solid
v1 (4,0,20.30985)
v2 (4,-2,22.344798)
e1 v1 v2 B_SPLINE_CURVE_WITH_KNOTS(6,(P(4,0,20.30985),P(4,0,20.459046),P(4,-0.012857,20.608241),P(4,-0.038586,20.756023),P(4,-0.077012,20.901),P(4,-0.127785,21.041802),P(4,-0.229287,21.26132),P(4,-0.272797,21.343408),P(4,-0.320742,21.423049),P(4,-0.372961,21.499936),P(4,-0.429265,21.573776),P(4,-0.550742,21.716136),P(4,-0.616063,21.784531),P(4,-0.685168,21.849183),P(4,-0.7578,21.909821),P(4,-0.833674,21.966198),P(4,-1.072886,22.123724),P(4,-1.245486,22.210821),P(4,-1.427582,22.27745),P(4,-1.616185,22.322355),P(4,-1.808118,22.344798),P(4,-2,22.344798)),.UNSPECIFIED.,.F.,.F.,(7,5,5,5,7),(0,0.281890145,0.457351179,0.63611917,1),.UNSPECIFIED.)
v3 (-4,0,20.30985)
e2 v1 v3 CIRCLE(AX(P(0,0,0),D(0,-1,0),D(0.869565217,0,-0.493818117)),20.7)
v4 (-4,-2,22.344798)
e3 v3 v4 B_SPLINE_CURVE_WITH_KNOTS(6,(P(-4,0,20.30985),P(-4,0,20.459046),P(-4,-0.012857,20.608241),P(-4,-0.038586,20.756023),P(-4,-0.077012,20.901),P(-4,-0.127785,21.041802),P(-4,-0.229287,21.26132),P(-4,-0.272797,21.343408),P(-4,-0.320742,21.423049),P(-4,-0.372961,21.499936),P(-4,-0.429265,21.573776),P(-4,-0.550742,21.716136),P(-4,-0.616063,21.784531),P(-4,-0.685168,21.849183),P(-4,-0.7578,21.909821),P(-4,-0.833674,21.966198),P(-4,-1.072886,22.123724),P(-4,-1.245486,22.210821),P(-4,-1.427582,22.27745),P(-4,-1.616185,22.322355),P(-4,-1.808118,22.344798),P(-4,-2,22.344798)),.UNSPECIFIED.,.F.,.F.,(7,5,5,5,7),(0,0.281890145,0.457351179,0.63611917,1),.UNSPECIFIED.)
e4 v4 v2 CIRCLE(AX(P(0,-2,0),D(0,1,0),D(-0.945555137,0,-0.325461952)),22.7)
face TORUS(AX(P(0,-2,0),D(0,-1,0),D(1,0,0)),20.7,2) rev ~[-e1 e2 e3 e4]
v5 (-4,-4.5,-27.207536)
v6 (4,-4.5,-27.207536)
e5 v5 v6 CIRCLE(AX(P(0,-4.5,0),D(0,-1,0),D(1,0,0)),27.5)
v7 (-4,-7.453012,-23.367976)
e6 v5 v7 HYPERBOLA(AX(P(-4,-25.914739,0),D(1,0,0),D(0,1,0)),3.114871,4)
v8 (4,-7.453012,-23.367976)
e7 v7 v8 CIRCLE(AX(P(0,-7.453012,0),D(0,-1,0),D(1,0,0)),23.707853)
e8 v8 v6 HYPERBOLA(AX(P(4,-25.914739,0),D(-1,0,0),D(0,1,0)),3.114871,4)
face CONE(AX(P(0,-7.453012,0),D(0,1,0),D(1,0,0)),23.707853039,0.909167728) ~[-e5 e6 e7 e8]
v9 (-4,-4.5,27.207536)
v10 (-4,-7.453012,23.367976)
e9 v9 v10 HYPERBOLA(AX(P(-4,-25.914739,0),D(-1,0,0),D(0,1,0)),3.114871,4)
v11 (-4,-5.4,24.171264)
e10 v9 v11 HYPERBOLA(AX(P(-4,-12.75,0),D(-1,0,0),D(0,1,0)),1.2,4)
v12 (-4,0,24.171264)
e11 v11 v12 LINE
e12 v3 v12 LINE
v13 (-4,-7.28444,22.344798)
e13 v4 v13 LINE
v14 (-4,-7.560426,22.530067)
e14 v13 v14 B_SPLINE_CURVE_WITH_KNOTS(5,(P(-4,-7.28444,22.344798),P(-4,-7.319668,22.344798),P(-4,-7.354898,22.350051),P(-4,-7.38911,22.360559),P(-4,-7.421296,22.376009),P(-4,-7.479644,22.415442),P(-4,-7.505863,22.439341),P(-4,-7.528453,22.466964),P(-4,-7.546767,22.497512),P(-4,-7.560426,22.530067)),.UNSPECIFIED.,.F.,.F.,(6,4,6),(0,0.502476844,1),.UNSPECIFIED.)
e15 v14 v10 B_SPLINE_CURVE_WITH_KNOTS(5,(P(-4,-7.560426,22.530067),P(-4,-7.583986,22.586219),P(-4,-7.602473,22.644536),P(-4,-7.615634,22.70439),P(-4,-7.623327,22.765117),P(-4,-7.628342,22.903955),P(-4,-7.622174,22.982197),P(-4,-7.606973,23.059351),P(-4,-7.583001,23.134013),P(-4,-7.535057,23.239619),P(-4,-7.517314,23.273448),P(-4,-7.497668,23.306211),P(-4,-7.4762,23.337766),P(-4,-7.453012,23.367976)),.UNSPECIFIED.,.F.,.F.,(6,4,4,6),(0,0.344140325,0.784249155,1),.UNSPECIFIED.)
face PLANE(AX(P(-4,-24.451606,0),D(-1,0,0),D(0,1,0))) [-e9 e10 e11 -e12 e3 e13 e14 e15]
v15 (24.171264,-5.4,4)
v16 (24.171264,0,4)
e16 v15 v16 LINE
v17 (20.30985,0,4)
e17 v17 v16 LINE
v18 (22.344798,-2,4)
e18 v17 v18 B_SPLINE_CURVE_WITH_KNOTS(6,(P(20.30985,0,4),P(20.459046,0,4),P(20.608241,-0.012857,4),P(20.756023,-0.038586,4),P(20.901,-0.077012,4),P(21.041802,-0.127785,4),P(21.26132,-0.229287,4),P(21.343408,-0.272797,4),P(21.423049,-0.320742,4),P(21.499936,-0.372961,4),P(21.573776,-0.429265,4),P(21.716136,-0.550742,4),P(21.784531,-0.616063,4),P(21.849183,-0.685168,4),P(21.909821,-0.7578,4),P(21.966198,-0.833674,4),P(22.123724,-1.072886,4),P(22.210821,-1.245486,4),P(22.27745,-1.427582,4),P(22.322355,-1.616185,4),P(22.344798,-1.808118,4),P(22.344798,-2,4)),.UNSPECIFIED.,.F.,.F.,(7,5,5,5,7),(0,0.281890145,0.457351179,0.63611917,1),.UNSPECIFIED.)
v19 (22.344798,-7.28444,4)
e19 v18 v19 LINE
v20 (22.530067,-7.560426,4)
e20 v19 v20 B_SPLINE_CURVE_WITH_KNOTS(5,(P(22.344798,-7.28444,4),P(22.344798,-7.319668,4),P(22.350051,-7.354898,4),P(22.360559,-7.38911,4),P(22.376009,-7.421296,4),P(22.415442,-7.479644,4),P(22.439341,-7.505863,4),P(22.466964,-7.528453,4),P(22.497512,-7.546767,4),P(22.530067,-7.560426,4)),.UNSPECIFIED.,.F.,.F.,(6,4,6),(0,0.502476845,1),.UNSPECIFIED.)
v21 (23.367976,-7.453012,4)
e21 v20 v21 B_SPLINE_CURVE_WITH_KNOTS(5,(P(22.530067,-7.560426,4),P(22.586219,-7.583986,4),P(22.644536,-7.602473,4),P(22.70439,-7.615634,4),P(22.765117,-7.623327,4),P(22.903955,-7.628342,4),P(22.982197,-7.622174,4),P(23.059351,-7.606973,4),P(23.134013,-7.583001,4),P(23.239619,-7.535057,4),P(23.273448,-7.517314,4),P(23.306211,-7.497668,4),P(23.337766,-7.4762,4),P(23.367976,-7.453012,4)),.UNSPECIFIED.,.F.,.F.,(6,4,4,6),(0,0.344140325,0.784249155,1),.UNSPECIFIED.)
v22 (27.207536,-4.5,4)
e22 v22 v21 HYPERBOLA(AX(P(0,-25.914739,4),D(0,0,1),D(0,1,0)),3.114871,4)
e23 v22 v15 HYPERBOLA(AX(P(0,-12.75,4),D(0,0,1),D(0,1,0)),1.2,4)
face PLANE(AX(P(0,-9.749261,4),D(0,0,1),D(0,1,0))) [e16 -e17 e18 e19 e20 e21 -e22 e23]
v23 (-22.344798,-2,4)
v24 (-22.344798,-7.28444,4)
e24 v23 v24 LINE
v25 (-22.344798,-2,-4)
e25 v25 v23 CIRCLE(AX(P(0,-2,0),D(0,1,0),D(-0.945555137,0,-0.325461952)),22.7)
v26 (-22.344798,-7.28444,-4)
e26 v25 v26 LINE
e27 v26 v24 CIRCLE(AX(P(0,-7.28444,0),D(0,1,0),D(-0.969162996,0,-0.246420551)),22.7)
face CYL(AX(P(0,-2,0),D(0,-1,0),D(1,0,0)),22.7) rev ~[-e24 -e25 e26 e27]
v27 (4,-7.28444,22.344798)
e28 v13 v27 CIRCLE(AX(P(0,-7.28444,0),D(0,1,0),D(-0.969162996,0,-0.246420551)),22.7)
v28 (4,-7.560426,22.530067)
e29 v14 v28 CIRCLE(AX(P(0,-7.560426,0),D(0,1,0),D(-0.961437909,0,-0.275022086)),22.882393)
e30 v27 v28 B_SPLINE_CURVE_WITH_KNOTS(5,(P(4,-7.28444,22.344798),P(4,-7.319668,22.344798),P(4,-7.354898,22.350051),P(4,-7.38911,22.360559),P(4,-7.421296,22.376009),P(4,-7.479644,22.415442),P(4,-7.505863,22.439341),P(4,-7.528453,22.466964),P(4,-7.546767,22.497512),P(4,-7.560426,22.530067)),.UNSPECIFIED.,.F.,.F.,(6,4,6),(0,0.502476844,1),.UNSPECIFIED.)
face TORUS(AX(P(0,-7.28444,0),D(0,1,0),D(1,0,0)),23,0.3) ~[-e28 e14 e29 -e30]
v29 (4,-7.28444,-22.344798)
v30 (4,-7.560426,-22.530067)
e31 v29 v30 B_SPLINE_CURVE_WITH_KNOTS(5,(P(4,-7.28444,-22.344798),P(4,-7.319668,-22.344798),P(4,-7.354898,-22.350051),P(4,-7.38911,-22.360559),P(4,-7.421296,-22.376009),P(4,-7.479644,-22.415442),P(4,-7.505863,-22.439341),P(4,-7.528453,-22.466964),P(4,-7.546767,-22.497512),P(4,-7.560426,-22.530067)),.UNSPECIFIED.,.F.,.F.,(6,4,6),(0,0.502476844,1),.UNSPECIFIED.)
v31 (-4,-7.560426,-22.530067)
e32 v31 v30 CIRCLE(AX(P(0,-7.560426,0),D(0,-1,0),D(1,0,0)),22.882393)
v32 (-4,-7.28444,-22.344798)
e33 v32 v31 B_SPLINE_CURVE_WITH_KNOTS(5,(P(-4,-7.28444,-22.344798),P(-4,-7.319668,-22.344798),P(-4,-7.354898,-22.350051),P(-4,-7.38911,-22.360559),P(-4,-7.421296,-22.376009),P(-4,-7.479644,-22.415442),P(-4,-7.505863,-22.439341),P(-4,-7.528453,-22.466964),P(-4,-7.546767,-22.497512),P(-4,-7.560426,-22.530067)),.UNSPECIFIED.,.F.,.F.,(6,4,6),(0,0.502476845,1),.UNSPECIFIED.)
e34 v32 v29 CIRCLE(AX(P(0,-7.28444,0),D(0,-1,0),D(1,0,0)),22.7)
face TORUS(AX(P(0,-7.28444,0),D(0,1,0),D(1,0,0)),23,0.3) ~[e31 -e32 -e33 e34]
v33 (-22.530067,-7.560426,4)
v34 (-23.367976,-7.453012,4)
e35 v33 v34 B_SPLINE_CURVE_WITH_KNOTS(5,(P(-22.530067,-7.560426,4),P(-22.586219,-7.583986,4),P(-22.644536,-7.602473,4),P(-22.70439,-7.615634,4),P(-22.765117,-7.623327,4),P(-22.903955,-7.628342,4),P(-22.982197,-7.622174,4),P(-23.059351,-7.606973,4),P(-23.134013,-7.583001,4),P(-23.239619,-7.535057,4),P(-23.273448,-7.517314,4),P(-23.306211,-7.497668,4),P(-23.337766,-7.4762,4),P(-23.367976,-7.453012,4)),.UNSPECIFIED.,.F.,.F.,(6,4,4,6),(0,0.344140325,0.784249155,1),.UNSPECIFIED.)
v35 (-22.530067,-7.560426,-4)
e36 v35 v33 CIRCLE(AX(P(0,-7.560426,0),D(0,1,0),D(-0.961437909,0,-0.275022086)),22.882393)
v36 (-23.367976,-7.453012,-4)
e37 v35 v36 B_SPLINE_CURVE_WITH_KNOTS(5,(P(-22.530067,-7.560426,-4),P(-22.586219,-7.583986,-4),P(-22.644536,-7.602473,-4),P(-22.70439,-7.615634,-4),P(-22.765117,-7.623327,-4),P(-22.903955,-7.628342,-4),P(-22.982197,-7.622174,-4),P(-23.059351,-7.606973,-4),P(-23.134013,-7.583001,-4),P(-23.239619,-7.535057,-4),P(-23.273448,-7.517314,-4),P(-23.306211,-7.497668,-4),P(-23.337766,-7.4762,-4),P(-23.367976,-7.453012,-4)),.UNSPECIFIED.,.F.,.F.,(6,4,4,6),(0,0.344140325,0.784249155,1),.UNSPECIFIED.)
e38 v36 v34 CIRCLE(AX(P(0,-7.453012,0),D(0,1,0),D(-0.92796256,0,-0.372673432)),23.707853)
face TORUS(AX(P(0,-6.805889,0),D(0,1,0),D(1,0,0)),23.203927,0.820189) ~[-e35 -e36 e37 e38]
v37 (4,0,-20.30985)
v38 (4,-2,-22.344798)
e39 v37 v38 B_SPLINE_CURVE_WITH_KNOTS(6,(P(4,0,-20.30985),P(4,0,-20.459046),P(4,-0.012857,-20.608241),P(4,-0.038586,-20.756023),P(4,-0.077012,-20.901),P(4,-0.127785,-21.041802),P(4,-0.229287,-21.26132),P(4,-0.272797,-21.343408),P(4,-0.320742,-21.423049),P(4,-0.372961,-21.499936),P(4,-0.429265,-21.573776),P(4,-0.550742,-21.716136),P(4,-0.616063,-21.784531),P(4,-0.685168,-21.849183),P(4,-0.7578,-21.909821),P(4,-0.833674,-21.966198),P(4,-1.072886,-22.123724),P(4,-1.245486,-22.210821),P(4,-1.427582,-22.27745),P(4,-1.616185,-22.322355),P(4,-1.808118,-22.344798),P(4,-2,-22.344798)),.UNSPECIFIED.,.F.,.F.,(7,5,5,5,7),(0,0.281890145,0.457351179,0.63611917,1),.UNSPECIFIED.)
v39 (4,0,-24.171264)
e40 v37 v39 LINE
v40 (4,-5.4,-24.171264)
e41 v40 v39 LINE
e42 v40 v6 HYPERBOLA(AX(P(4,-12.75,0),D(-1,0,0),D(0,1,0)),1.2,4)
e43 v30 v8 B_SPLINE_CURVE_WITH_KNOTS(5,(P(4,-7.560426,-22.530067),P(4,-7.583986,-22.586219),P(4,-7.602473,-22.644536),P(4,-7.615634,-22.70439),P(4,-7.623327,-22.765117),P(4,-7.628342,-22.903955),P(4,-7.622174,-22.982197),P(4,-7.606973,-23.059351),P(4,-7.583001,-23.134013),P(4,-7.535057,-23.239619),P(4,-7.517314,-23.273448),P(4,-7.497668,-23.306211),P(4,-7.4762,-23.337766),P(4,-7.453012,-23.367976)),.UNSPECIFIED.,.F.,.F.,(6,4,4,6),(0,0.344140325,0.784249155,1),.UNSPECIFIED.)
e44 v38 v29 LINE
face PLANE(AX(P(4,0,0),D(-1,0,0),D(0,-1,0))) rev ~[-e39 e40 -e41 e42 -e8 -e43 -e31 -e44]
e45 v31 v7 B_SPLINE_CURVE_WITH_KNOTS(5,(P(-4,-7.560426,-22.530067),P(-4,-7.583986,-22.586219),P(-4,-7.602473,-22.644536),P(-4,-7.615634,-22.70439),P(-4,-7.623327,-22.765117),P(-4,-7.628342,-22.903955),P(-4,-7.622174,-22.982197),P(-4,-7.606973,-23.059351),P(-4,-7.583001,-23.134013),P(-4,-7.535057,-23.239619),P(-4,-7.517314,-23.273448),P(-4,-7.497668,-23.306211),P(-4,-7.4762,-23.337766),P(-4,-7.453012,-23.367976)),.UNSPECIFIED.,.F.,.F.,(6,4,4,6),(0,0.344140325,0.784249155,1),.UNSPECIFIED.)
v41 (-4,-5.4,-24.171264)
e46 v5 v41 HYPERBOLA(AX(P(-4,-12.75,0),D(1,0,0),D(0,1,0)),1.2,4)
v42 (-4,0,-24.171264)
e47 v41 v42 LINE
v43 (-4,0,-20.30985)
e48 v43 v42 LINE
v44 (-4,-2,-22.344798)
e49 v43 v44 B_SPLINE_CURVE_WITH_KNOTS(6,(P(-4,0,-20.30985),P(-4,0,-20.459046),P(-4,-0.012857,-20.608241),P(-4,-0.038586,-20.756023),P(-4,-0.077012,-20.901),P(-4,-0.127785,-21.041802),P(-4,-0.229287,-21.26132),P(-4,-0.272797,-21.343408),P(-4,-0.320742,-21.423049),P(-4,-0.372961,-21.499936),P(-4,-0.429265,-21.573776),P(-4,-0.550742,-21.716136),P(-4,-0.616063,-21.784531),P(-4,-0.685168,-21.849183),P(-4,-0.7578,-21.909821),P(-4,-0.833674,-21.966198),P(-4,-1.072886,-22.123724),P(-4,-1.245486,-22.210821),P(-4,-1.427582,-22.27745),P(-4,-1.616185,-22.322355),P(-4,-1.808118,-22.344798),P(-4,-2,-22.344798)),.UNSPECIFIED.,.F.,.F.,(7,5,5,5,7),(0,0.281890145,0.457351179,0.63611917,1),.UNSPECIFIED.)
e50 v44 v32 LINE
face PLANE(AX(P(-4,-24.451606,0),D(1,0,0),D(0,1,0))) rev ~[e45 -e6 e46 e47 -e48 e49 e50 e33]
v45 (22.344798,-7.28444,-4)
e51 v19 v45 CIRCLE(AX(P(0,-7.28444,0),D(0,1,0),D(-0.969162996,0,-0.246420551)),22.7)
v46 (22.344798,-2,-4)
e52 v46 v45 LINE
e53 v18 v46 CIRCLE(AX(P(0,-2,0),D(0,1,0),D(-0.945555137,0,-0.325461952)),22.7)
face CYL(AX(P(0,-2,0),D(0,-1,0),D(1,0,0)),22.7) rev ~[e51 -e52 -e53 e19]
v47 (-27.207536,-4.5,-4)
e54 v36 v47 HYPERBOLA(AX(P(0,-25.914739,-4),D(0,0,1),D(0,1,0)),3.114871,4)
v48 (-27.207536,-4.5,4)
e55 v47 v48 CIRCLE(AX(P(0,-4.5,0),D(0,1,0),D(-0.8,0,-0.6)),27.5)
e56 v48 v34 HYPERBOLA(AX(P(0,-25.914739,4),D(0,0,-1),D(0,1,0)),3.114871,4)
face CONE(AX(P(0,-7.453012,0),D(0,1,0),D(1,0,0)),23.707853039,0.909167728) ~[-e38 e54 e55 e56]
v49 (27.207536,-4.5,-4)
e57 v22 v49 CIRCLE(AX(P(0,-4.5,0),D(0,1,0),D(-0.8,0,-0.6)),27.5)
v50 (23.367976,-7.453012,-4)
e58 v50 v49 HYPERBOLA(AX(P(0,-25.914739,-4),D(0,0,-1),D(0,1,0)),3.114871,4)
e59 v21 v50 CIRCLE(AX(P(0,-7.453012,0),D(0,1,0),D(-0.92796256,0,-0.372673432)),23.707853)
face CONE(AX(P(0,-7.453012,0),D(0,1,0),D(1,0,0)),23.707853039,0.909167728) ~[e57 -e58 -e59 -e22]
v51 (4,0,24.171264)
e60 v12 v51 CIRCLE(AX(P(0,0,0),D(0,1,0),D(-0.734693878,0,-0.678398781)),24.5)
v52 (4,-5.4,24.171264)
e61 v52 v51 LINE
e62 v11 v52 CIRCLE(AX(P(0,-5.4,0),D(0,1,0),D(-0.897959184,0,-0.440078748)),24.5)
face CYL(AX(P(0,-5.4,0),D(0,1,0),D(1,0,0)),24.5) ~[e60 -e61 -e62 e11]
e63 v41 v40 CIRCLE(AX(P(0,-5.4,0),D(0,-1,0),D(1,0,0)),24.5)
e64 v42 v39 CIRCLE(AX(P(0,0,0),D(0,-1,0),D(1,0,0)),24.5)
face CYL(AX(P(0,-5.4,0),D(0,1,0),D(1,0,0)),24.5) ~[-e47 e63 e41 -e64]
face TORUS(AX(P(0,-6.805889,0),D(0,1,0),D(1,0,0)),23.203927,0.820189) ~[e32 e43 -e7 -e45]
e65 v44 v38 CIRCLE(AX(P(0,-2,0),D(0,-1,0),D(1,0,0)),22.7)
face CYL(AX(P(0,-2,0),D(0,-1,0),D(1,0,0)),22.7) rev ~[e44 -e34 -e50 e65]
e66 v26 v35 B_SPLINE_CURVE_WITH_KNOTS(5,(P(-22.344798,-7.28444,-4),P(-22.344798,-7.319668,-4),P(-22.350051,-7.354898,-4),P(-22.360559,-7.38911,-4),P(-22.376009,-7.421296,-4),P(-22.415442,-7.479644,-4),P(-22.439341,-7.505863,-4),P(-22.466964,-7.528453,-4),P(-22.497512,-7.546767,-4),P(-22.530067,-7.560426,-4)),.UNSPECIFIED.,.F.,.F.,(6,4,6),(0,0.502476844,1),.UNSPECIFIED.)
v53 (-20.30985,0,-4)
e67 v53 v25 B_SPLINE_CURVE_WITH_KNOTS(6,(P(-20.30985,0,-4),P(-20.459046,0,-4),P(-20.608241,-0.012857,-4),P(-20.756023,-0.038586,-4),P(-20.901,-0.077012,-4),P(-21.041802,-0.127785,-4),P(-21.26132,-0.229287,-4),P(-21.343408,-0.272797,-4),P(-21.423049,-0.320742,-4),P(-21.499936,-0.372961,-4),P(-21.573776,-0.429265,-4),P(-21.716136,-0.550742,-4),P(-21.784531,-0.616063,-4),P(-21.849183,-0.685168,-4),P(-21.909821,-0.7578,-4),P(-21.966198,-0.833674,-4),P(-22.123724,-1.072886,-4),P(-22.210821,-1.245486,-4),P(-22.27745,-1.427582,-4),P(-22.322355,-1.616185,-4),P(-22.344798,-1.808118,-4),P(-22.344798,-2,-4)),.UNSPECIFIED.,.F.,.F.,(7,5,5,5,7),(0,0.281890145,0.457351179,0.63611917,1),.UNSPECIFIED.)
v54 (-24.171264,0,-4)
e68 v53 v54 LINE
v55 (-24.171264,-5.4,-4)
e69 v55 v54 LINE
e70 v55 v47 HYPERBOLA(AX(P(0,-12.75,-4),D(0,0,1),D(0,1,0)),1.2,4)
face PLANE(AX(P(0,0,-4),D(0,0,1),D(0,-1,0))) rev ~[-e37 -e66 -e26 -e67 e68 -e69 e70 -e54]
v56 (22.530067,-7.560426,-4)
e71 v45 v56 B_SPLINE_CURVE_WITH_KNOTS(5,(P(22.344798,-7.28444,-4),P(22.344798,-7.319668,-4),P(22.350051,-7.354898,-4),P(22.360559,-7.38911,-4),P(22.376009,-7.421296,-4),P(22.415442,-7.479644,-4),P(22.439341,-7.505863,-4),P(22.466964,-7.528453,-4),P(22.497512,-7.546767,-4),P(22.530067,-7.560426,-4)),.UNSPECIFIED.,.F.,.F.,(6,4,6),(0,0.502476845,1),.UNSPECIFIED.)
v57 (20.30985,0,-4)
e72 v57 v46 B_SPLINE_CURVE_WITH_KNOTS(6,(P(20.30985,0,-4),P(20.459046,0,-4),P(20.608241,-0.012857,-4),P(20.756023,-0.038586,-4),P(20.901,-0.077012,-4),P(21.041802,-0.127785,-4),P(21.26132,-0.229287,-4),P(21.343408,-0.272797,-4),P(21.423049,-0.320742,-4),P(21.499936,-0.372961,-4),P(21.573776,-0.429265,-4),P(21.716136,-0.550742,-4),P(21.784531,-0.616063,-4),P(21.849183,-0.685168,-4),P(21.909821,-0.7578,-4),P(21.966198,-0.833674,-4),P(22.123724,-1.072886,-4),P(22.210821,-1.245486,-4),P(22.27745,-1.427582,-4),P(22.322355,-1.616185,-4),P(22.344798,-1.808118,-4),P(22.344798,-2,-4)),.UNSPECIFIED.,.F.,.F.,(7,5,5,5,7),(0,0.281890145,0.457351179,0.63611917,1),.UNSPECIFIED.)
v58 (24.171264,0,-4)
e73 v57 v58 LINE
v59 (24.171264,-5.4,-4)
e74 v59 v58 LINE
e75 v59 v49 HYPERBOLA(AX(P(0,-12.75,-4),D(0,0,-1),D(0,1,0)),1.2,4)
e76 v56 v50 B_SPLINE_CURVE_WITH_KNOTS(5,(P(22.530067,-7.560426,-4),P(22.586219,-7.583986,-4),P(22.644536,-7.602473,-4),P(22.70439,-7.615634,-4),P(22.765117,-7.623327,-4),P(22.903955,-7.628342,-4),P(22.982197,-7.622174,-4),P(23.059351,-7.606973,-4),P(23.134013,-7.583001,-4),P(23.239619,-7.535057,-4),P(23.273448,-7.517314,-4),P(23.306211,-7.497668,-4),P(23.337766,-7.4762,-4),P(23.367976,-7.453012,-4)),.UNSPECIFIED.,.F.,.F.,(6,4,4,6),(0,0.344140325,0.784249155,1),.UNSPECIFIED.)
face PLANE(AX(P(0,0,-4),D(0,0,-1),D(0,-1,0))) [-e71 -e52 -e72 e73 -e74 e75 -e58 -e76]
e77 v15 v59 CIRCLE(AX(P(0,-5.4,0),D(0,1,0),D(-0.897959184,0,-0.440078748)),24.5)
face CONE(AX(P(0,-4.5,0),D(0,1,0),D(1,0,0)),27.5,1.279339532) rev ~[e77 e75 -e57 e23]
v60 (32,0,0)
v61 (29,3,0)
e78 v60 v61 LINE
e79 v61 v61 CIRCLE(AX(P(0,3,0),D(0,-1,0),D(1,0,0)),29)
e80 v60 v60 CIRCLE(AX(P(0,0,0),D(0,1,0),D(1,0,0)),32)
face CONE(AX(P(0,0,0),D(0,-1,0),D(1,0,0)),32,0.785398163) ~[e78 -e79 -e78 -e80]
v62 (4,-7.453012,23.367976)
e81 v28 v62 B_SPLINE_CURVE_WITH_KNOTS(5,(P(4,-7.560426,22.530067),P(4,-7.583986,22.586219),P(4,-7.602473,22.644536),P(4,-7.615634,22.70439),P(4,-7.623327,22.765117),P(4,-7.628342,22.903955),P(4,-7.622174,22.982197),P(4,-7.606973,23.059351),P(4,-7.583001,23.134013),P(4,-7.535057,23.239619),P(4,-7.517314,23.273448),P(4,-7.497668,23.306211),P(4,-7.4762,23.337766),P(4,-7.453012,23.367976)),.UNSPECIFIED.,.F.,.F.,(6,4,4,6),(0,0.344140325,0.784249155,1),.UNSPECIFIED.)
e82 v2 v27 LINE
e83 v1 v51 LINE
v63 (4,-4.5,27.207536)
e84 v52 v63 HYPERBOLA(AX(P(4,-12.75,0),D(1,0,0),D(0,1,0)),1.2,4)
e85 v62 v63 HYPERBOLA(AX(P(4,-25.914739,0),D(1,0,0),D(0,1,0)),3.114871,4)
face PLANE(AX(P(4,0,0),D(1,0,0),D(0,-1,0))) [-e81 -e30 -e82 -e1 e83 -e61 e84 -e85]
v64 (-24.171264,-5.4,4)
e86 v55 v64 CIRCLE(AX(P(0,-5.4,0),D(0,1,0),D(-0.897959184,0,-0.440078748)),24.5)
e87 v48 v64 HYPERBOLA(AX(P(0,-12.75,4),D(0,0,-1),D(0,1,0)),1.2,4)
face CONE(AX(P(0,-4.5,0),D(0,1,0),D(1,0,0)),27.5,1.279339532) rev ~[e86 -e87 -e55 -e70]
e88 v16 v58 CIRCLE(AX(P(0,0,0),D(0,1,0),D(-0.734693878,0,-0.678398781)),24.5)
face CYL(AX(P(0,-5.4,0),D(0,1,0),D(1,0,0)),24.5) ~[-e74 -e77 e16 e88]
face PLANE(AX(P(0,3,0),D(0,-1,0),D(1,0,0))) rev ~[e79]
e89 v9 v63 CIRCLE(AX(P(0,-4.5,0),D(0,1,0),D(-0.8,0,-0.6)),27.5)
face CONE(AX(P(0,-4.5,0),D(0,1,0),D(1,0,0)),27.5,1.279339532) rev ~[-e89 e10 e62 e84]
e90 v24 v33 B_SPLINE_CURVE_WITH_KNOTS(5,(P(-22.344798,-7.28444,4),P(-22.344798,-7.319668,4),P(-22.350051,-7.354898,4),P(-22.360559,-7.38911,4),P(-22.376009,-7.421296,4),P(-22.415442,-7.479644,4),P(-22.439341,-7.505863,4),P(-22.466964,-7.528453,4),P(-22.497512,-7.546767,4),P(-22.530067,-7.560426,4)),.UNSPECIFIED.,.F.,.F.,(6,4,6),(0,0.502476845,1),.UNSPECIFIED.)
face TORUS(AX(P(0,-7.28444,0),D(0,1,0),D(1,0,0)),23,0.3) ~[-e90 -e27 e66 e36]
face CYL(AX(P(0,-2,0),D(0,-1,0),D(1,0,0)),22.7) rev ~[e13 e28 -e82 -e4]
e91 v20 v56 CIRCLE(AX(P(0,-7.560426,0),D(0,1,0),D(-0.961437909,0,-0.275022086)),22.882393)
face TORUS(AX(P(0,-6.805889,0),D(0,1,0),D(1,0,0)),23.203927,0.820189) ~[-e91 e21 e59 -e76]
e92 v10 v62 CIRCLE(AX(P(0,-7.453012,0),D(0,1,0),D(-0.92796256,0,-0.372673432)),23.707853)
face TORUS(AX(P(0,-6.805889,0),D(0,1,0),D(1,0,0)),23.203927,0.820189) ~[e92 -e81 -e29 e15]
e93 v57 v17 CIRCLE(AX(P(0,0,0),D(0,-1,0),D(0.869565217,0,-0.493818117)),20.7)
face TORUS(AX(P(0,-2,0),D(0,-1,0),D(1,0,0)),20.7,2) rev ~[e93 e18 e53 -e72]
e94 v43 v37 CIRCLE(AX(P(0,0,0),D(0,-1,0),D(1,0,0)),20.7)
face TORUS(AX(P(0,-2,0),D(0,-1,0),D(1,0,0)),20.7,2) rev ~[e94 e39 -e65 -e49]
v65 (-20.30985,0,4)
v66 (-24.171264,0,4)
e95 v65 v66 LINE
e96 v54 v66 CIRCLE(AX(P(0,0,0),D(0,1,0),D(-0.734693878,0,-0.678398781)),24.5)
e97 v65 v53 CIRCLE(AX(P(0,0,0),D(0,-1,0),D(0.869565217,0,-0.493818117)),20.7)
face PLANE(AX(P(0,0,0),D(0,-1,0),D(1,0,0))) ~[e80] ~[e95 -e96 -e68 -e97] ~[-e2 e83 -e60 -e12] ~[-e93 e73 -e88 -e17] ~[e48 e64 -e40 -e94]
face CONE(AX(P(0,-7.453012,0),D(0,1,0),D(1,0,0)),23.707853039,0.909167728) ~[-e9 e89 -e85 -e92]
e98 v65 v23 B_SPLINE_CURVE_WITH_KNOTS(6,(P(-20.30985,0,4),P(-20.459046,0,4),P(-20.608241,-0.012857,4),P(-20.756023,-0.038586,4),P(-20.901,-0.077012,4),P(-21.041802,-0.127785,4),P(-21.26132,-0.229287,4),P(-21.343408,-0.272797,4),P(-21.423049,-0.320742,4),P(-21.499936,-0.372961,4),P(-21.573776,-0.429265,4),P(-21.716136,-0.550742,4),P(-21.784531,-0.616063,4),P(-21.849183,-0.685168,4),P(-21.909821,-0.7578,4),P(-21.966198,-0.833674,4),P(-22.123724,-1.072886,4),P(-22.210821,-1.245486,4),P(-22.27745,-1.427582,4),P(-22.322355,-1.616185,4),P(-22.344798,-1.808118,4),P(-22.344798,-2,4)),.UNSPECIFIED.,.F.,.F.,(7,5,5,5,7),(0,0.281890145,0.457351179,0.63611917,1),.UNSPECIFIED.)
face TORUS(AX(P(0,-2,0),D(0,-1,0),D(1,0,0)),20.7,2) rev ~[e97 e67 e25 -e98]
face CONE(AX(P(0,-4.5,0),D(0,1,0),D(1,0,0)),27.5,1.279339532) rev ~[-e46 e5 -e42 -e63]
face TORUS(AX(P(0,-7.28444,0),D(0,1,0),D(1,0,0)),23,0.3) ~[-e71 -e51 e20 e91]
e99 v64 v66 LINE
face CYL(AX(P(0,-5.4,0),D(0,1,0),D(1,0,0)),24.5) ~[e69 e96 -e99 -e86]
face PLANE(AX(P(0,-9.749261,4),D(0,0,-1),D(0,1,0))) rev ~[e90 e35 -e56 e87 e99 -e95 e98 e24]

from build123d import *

# Parameters (mm, degrees)
F3_DEPTH      = 32.001
F3_DEPTH_BACK = 32.001
F5_DEPTH      = 32.001
F5_DEPTH_BACK = 32.001


# Not quite as in the source:
# - a feature names something its author has since deleted; it is built from what else it names


with BuildPart() as f1:
    # F0 (on Top) → F1 (revolve)
    with BuildSketch(Plane.XY):
        with BuildLine():
            Line((29, 3), (0, 3))
            Line((0, 3), (0, 0))
            Line((0, 0), (20.7, 0))
            ThreePointArc((20.7, 0), (22.1142135624, -0.5857864376), (22.7, -2))
            Line((22.7, -2), (22.7, -7.2844397868))
            ThreePointArc((22.7, -7.2844397868), (22.7497180358, -7.4498451628), (22.8823929227, -7.5604263361))
            ThreePointArc((22.8823929227, -7.5604263361), (23.3097624273, -7.6192211516), (23.7078530386, -7.45301228))
            Line((23.7078530386, -7.45301228), (27.5, -4.5))
            Line((27.5, -4.5), (24.5, -5.4))
            Line((24.5, -5.4), (24.5, -3))
            Line((24.5, -3), (24.5, 0))
            Line((24.5, 0), (32, 0))
            Line((32, 0), (29, 3))
        make_face()
    revolve(axis=Axis((0, -3.2623065636, 0), (0, -1, 0)))

    # F2 (on Top) → F3 (cut, two sides)
    with BuildSketch(Plane.XY) as f3_sk:
        with BuildLine():
            Line((-4, 0), (-18, 0))
            ThreePointArc((-18, 0), (-20.8284271247, -1.1715728753), (-22, -4))
            Line((-22, -4), (-22, -24.4516061772))
            Line((-22, -24.4516061772), (-4, -24.4516061772))
            Line((-4, -24.4516061772), (-4, 0))
        make_face()
        with BuildLine():
            Line((18, 0), (4, 0))
            Line((4, 0), (4, -24.4516061772))
            Line((4, -24.4516061772), (22, -24.4516061772))
            Line((22, -24.4516061772), (22, -4))
            ThreePointArc((22, -4), (20.8284271247, -1.1715728753), (18, 0))
        make_face()
    extrude(amount=-F3_DEPTH, mode=Mode.SUBTRACT)
    extrude(f3_sk.sketch, amount=F3_DEPTH_BACK, mode=Mode.SUBTRACT)

    # F4 (on Right) → F5 (cut, two sides)
    with BuildSketch(Plane.YZ) as f5_sk:
        with BuildLine():
            Line((-9.7492614017, 4), (0, 4))
            Line((0, 4), (0, 18))
            ThreePointArc((0, 18), (-1.1715728753, 20.8284271247), (-4, 22))
            Line((-4, 22), (-9.7492614017, 22))
            Line((-9.7492614017, 22), (-9.7492614017, 4))
        make_face()
        with BuildLine():
            Line((0, -18), (0, -4))
            Line((0, -4), (-9.764377423, -4))
            Line((-9.764377423, -4), (-9.764377423, -22))
            Line((-9.764377423, -22), (-4, -22))
            ThreePointArc((-4, -22), (-1.1715728753, -20.8284271247), (0, -18))
        make_face()
    extrude(amount=-F5_DEPTH, mode=Mode.SUBTRACT)
    extrude(f5_sk.sketch, amount=F5_DEPTH_BACK, mode=Mode.SUBTRACT)


solid = f1.part
